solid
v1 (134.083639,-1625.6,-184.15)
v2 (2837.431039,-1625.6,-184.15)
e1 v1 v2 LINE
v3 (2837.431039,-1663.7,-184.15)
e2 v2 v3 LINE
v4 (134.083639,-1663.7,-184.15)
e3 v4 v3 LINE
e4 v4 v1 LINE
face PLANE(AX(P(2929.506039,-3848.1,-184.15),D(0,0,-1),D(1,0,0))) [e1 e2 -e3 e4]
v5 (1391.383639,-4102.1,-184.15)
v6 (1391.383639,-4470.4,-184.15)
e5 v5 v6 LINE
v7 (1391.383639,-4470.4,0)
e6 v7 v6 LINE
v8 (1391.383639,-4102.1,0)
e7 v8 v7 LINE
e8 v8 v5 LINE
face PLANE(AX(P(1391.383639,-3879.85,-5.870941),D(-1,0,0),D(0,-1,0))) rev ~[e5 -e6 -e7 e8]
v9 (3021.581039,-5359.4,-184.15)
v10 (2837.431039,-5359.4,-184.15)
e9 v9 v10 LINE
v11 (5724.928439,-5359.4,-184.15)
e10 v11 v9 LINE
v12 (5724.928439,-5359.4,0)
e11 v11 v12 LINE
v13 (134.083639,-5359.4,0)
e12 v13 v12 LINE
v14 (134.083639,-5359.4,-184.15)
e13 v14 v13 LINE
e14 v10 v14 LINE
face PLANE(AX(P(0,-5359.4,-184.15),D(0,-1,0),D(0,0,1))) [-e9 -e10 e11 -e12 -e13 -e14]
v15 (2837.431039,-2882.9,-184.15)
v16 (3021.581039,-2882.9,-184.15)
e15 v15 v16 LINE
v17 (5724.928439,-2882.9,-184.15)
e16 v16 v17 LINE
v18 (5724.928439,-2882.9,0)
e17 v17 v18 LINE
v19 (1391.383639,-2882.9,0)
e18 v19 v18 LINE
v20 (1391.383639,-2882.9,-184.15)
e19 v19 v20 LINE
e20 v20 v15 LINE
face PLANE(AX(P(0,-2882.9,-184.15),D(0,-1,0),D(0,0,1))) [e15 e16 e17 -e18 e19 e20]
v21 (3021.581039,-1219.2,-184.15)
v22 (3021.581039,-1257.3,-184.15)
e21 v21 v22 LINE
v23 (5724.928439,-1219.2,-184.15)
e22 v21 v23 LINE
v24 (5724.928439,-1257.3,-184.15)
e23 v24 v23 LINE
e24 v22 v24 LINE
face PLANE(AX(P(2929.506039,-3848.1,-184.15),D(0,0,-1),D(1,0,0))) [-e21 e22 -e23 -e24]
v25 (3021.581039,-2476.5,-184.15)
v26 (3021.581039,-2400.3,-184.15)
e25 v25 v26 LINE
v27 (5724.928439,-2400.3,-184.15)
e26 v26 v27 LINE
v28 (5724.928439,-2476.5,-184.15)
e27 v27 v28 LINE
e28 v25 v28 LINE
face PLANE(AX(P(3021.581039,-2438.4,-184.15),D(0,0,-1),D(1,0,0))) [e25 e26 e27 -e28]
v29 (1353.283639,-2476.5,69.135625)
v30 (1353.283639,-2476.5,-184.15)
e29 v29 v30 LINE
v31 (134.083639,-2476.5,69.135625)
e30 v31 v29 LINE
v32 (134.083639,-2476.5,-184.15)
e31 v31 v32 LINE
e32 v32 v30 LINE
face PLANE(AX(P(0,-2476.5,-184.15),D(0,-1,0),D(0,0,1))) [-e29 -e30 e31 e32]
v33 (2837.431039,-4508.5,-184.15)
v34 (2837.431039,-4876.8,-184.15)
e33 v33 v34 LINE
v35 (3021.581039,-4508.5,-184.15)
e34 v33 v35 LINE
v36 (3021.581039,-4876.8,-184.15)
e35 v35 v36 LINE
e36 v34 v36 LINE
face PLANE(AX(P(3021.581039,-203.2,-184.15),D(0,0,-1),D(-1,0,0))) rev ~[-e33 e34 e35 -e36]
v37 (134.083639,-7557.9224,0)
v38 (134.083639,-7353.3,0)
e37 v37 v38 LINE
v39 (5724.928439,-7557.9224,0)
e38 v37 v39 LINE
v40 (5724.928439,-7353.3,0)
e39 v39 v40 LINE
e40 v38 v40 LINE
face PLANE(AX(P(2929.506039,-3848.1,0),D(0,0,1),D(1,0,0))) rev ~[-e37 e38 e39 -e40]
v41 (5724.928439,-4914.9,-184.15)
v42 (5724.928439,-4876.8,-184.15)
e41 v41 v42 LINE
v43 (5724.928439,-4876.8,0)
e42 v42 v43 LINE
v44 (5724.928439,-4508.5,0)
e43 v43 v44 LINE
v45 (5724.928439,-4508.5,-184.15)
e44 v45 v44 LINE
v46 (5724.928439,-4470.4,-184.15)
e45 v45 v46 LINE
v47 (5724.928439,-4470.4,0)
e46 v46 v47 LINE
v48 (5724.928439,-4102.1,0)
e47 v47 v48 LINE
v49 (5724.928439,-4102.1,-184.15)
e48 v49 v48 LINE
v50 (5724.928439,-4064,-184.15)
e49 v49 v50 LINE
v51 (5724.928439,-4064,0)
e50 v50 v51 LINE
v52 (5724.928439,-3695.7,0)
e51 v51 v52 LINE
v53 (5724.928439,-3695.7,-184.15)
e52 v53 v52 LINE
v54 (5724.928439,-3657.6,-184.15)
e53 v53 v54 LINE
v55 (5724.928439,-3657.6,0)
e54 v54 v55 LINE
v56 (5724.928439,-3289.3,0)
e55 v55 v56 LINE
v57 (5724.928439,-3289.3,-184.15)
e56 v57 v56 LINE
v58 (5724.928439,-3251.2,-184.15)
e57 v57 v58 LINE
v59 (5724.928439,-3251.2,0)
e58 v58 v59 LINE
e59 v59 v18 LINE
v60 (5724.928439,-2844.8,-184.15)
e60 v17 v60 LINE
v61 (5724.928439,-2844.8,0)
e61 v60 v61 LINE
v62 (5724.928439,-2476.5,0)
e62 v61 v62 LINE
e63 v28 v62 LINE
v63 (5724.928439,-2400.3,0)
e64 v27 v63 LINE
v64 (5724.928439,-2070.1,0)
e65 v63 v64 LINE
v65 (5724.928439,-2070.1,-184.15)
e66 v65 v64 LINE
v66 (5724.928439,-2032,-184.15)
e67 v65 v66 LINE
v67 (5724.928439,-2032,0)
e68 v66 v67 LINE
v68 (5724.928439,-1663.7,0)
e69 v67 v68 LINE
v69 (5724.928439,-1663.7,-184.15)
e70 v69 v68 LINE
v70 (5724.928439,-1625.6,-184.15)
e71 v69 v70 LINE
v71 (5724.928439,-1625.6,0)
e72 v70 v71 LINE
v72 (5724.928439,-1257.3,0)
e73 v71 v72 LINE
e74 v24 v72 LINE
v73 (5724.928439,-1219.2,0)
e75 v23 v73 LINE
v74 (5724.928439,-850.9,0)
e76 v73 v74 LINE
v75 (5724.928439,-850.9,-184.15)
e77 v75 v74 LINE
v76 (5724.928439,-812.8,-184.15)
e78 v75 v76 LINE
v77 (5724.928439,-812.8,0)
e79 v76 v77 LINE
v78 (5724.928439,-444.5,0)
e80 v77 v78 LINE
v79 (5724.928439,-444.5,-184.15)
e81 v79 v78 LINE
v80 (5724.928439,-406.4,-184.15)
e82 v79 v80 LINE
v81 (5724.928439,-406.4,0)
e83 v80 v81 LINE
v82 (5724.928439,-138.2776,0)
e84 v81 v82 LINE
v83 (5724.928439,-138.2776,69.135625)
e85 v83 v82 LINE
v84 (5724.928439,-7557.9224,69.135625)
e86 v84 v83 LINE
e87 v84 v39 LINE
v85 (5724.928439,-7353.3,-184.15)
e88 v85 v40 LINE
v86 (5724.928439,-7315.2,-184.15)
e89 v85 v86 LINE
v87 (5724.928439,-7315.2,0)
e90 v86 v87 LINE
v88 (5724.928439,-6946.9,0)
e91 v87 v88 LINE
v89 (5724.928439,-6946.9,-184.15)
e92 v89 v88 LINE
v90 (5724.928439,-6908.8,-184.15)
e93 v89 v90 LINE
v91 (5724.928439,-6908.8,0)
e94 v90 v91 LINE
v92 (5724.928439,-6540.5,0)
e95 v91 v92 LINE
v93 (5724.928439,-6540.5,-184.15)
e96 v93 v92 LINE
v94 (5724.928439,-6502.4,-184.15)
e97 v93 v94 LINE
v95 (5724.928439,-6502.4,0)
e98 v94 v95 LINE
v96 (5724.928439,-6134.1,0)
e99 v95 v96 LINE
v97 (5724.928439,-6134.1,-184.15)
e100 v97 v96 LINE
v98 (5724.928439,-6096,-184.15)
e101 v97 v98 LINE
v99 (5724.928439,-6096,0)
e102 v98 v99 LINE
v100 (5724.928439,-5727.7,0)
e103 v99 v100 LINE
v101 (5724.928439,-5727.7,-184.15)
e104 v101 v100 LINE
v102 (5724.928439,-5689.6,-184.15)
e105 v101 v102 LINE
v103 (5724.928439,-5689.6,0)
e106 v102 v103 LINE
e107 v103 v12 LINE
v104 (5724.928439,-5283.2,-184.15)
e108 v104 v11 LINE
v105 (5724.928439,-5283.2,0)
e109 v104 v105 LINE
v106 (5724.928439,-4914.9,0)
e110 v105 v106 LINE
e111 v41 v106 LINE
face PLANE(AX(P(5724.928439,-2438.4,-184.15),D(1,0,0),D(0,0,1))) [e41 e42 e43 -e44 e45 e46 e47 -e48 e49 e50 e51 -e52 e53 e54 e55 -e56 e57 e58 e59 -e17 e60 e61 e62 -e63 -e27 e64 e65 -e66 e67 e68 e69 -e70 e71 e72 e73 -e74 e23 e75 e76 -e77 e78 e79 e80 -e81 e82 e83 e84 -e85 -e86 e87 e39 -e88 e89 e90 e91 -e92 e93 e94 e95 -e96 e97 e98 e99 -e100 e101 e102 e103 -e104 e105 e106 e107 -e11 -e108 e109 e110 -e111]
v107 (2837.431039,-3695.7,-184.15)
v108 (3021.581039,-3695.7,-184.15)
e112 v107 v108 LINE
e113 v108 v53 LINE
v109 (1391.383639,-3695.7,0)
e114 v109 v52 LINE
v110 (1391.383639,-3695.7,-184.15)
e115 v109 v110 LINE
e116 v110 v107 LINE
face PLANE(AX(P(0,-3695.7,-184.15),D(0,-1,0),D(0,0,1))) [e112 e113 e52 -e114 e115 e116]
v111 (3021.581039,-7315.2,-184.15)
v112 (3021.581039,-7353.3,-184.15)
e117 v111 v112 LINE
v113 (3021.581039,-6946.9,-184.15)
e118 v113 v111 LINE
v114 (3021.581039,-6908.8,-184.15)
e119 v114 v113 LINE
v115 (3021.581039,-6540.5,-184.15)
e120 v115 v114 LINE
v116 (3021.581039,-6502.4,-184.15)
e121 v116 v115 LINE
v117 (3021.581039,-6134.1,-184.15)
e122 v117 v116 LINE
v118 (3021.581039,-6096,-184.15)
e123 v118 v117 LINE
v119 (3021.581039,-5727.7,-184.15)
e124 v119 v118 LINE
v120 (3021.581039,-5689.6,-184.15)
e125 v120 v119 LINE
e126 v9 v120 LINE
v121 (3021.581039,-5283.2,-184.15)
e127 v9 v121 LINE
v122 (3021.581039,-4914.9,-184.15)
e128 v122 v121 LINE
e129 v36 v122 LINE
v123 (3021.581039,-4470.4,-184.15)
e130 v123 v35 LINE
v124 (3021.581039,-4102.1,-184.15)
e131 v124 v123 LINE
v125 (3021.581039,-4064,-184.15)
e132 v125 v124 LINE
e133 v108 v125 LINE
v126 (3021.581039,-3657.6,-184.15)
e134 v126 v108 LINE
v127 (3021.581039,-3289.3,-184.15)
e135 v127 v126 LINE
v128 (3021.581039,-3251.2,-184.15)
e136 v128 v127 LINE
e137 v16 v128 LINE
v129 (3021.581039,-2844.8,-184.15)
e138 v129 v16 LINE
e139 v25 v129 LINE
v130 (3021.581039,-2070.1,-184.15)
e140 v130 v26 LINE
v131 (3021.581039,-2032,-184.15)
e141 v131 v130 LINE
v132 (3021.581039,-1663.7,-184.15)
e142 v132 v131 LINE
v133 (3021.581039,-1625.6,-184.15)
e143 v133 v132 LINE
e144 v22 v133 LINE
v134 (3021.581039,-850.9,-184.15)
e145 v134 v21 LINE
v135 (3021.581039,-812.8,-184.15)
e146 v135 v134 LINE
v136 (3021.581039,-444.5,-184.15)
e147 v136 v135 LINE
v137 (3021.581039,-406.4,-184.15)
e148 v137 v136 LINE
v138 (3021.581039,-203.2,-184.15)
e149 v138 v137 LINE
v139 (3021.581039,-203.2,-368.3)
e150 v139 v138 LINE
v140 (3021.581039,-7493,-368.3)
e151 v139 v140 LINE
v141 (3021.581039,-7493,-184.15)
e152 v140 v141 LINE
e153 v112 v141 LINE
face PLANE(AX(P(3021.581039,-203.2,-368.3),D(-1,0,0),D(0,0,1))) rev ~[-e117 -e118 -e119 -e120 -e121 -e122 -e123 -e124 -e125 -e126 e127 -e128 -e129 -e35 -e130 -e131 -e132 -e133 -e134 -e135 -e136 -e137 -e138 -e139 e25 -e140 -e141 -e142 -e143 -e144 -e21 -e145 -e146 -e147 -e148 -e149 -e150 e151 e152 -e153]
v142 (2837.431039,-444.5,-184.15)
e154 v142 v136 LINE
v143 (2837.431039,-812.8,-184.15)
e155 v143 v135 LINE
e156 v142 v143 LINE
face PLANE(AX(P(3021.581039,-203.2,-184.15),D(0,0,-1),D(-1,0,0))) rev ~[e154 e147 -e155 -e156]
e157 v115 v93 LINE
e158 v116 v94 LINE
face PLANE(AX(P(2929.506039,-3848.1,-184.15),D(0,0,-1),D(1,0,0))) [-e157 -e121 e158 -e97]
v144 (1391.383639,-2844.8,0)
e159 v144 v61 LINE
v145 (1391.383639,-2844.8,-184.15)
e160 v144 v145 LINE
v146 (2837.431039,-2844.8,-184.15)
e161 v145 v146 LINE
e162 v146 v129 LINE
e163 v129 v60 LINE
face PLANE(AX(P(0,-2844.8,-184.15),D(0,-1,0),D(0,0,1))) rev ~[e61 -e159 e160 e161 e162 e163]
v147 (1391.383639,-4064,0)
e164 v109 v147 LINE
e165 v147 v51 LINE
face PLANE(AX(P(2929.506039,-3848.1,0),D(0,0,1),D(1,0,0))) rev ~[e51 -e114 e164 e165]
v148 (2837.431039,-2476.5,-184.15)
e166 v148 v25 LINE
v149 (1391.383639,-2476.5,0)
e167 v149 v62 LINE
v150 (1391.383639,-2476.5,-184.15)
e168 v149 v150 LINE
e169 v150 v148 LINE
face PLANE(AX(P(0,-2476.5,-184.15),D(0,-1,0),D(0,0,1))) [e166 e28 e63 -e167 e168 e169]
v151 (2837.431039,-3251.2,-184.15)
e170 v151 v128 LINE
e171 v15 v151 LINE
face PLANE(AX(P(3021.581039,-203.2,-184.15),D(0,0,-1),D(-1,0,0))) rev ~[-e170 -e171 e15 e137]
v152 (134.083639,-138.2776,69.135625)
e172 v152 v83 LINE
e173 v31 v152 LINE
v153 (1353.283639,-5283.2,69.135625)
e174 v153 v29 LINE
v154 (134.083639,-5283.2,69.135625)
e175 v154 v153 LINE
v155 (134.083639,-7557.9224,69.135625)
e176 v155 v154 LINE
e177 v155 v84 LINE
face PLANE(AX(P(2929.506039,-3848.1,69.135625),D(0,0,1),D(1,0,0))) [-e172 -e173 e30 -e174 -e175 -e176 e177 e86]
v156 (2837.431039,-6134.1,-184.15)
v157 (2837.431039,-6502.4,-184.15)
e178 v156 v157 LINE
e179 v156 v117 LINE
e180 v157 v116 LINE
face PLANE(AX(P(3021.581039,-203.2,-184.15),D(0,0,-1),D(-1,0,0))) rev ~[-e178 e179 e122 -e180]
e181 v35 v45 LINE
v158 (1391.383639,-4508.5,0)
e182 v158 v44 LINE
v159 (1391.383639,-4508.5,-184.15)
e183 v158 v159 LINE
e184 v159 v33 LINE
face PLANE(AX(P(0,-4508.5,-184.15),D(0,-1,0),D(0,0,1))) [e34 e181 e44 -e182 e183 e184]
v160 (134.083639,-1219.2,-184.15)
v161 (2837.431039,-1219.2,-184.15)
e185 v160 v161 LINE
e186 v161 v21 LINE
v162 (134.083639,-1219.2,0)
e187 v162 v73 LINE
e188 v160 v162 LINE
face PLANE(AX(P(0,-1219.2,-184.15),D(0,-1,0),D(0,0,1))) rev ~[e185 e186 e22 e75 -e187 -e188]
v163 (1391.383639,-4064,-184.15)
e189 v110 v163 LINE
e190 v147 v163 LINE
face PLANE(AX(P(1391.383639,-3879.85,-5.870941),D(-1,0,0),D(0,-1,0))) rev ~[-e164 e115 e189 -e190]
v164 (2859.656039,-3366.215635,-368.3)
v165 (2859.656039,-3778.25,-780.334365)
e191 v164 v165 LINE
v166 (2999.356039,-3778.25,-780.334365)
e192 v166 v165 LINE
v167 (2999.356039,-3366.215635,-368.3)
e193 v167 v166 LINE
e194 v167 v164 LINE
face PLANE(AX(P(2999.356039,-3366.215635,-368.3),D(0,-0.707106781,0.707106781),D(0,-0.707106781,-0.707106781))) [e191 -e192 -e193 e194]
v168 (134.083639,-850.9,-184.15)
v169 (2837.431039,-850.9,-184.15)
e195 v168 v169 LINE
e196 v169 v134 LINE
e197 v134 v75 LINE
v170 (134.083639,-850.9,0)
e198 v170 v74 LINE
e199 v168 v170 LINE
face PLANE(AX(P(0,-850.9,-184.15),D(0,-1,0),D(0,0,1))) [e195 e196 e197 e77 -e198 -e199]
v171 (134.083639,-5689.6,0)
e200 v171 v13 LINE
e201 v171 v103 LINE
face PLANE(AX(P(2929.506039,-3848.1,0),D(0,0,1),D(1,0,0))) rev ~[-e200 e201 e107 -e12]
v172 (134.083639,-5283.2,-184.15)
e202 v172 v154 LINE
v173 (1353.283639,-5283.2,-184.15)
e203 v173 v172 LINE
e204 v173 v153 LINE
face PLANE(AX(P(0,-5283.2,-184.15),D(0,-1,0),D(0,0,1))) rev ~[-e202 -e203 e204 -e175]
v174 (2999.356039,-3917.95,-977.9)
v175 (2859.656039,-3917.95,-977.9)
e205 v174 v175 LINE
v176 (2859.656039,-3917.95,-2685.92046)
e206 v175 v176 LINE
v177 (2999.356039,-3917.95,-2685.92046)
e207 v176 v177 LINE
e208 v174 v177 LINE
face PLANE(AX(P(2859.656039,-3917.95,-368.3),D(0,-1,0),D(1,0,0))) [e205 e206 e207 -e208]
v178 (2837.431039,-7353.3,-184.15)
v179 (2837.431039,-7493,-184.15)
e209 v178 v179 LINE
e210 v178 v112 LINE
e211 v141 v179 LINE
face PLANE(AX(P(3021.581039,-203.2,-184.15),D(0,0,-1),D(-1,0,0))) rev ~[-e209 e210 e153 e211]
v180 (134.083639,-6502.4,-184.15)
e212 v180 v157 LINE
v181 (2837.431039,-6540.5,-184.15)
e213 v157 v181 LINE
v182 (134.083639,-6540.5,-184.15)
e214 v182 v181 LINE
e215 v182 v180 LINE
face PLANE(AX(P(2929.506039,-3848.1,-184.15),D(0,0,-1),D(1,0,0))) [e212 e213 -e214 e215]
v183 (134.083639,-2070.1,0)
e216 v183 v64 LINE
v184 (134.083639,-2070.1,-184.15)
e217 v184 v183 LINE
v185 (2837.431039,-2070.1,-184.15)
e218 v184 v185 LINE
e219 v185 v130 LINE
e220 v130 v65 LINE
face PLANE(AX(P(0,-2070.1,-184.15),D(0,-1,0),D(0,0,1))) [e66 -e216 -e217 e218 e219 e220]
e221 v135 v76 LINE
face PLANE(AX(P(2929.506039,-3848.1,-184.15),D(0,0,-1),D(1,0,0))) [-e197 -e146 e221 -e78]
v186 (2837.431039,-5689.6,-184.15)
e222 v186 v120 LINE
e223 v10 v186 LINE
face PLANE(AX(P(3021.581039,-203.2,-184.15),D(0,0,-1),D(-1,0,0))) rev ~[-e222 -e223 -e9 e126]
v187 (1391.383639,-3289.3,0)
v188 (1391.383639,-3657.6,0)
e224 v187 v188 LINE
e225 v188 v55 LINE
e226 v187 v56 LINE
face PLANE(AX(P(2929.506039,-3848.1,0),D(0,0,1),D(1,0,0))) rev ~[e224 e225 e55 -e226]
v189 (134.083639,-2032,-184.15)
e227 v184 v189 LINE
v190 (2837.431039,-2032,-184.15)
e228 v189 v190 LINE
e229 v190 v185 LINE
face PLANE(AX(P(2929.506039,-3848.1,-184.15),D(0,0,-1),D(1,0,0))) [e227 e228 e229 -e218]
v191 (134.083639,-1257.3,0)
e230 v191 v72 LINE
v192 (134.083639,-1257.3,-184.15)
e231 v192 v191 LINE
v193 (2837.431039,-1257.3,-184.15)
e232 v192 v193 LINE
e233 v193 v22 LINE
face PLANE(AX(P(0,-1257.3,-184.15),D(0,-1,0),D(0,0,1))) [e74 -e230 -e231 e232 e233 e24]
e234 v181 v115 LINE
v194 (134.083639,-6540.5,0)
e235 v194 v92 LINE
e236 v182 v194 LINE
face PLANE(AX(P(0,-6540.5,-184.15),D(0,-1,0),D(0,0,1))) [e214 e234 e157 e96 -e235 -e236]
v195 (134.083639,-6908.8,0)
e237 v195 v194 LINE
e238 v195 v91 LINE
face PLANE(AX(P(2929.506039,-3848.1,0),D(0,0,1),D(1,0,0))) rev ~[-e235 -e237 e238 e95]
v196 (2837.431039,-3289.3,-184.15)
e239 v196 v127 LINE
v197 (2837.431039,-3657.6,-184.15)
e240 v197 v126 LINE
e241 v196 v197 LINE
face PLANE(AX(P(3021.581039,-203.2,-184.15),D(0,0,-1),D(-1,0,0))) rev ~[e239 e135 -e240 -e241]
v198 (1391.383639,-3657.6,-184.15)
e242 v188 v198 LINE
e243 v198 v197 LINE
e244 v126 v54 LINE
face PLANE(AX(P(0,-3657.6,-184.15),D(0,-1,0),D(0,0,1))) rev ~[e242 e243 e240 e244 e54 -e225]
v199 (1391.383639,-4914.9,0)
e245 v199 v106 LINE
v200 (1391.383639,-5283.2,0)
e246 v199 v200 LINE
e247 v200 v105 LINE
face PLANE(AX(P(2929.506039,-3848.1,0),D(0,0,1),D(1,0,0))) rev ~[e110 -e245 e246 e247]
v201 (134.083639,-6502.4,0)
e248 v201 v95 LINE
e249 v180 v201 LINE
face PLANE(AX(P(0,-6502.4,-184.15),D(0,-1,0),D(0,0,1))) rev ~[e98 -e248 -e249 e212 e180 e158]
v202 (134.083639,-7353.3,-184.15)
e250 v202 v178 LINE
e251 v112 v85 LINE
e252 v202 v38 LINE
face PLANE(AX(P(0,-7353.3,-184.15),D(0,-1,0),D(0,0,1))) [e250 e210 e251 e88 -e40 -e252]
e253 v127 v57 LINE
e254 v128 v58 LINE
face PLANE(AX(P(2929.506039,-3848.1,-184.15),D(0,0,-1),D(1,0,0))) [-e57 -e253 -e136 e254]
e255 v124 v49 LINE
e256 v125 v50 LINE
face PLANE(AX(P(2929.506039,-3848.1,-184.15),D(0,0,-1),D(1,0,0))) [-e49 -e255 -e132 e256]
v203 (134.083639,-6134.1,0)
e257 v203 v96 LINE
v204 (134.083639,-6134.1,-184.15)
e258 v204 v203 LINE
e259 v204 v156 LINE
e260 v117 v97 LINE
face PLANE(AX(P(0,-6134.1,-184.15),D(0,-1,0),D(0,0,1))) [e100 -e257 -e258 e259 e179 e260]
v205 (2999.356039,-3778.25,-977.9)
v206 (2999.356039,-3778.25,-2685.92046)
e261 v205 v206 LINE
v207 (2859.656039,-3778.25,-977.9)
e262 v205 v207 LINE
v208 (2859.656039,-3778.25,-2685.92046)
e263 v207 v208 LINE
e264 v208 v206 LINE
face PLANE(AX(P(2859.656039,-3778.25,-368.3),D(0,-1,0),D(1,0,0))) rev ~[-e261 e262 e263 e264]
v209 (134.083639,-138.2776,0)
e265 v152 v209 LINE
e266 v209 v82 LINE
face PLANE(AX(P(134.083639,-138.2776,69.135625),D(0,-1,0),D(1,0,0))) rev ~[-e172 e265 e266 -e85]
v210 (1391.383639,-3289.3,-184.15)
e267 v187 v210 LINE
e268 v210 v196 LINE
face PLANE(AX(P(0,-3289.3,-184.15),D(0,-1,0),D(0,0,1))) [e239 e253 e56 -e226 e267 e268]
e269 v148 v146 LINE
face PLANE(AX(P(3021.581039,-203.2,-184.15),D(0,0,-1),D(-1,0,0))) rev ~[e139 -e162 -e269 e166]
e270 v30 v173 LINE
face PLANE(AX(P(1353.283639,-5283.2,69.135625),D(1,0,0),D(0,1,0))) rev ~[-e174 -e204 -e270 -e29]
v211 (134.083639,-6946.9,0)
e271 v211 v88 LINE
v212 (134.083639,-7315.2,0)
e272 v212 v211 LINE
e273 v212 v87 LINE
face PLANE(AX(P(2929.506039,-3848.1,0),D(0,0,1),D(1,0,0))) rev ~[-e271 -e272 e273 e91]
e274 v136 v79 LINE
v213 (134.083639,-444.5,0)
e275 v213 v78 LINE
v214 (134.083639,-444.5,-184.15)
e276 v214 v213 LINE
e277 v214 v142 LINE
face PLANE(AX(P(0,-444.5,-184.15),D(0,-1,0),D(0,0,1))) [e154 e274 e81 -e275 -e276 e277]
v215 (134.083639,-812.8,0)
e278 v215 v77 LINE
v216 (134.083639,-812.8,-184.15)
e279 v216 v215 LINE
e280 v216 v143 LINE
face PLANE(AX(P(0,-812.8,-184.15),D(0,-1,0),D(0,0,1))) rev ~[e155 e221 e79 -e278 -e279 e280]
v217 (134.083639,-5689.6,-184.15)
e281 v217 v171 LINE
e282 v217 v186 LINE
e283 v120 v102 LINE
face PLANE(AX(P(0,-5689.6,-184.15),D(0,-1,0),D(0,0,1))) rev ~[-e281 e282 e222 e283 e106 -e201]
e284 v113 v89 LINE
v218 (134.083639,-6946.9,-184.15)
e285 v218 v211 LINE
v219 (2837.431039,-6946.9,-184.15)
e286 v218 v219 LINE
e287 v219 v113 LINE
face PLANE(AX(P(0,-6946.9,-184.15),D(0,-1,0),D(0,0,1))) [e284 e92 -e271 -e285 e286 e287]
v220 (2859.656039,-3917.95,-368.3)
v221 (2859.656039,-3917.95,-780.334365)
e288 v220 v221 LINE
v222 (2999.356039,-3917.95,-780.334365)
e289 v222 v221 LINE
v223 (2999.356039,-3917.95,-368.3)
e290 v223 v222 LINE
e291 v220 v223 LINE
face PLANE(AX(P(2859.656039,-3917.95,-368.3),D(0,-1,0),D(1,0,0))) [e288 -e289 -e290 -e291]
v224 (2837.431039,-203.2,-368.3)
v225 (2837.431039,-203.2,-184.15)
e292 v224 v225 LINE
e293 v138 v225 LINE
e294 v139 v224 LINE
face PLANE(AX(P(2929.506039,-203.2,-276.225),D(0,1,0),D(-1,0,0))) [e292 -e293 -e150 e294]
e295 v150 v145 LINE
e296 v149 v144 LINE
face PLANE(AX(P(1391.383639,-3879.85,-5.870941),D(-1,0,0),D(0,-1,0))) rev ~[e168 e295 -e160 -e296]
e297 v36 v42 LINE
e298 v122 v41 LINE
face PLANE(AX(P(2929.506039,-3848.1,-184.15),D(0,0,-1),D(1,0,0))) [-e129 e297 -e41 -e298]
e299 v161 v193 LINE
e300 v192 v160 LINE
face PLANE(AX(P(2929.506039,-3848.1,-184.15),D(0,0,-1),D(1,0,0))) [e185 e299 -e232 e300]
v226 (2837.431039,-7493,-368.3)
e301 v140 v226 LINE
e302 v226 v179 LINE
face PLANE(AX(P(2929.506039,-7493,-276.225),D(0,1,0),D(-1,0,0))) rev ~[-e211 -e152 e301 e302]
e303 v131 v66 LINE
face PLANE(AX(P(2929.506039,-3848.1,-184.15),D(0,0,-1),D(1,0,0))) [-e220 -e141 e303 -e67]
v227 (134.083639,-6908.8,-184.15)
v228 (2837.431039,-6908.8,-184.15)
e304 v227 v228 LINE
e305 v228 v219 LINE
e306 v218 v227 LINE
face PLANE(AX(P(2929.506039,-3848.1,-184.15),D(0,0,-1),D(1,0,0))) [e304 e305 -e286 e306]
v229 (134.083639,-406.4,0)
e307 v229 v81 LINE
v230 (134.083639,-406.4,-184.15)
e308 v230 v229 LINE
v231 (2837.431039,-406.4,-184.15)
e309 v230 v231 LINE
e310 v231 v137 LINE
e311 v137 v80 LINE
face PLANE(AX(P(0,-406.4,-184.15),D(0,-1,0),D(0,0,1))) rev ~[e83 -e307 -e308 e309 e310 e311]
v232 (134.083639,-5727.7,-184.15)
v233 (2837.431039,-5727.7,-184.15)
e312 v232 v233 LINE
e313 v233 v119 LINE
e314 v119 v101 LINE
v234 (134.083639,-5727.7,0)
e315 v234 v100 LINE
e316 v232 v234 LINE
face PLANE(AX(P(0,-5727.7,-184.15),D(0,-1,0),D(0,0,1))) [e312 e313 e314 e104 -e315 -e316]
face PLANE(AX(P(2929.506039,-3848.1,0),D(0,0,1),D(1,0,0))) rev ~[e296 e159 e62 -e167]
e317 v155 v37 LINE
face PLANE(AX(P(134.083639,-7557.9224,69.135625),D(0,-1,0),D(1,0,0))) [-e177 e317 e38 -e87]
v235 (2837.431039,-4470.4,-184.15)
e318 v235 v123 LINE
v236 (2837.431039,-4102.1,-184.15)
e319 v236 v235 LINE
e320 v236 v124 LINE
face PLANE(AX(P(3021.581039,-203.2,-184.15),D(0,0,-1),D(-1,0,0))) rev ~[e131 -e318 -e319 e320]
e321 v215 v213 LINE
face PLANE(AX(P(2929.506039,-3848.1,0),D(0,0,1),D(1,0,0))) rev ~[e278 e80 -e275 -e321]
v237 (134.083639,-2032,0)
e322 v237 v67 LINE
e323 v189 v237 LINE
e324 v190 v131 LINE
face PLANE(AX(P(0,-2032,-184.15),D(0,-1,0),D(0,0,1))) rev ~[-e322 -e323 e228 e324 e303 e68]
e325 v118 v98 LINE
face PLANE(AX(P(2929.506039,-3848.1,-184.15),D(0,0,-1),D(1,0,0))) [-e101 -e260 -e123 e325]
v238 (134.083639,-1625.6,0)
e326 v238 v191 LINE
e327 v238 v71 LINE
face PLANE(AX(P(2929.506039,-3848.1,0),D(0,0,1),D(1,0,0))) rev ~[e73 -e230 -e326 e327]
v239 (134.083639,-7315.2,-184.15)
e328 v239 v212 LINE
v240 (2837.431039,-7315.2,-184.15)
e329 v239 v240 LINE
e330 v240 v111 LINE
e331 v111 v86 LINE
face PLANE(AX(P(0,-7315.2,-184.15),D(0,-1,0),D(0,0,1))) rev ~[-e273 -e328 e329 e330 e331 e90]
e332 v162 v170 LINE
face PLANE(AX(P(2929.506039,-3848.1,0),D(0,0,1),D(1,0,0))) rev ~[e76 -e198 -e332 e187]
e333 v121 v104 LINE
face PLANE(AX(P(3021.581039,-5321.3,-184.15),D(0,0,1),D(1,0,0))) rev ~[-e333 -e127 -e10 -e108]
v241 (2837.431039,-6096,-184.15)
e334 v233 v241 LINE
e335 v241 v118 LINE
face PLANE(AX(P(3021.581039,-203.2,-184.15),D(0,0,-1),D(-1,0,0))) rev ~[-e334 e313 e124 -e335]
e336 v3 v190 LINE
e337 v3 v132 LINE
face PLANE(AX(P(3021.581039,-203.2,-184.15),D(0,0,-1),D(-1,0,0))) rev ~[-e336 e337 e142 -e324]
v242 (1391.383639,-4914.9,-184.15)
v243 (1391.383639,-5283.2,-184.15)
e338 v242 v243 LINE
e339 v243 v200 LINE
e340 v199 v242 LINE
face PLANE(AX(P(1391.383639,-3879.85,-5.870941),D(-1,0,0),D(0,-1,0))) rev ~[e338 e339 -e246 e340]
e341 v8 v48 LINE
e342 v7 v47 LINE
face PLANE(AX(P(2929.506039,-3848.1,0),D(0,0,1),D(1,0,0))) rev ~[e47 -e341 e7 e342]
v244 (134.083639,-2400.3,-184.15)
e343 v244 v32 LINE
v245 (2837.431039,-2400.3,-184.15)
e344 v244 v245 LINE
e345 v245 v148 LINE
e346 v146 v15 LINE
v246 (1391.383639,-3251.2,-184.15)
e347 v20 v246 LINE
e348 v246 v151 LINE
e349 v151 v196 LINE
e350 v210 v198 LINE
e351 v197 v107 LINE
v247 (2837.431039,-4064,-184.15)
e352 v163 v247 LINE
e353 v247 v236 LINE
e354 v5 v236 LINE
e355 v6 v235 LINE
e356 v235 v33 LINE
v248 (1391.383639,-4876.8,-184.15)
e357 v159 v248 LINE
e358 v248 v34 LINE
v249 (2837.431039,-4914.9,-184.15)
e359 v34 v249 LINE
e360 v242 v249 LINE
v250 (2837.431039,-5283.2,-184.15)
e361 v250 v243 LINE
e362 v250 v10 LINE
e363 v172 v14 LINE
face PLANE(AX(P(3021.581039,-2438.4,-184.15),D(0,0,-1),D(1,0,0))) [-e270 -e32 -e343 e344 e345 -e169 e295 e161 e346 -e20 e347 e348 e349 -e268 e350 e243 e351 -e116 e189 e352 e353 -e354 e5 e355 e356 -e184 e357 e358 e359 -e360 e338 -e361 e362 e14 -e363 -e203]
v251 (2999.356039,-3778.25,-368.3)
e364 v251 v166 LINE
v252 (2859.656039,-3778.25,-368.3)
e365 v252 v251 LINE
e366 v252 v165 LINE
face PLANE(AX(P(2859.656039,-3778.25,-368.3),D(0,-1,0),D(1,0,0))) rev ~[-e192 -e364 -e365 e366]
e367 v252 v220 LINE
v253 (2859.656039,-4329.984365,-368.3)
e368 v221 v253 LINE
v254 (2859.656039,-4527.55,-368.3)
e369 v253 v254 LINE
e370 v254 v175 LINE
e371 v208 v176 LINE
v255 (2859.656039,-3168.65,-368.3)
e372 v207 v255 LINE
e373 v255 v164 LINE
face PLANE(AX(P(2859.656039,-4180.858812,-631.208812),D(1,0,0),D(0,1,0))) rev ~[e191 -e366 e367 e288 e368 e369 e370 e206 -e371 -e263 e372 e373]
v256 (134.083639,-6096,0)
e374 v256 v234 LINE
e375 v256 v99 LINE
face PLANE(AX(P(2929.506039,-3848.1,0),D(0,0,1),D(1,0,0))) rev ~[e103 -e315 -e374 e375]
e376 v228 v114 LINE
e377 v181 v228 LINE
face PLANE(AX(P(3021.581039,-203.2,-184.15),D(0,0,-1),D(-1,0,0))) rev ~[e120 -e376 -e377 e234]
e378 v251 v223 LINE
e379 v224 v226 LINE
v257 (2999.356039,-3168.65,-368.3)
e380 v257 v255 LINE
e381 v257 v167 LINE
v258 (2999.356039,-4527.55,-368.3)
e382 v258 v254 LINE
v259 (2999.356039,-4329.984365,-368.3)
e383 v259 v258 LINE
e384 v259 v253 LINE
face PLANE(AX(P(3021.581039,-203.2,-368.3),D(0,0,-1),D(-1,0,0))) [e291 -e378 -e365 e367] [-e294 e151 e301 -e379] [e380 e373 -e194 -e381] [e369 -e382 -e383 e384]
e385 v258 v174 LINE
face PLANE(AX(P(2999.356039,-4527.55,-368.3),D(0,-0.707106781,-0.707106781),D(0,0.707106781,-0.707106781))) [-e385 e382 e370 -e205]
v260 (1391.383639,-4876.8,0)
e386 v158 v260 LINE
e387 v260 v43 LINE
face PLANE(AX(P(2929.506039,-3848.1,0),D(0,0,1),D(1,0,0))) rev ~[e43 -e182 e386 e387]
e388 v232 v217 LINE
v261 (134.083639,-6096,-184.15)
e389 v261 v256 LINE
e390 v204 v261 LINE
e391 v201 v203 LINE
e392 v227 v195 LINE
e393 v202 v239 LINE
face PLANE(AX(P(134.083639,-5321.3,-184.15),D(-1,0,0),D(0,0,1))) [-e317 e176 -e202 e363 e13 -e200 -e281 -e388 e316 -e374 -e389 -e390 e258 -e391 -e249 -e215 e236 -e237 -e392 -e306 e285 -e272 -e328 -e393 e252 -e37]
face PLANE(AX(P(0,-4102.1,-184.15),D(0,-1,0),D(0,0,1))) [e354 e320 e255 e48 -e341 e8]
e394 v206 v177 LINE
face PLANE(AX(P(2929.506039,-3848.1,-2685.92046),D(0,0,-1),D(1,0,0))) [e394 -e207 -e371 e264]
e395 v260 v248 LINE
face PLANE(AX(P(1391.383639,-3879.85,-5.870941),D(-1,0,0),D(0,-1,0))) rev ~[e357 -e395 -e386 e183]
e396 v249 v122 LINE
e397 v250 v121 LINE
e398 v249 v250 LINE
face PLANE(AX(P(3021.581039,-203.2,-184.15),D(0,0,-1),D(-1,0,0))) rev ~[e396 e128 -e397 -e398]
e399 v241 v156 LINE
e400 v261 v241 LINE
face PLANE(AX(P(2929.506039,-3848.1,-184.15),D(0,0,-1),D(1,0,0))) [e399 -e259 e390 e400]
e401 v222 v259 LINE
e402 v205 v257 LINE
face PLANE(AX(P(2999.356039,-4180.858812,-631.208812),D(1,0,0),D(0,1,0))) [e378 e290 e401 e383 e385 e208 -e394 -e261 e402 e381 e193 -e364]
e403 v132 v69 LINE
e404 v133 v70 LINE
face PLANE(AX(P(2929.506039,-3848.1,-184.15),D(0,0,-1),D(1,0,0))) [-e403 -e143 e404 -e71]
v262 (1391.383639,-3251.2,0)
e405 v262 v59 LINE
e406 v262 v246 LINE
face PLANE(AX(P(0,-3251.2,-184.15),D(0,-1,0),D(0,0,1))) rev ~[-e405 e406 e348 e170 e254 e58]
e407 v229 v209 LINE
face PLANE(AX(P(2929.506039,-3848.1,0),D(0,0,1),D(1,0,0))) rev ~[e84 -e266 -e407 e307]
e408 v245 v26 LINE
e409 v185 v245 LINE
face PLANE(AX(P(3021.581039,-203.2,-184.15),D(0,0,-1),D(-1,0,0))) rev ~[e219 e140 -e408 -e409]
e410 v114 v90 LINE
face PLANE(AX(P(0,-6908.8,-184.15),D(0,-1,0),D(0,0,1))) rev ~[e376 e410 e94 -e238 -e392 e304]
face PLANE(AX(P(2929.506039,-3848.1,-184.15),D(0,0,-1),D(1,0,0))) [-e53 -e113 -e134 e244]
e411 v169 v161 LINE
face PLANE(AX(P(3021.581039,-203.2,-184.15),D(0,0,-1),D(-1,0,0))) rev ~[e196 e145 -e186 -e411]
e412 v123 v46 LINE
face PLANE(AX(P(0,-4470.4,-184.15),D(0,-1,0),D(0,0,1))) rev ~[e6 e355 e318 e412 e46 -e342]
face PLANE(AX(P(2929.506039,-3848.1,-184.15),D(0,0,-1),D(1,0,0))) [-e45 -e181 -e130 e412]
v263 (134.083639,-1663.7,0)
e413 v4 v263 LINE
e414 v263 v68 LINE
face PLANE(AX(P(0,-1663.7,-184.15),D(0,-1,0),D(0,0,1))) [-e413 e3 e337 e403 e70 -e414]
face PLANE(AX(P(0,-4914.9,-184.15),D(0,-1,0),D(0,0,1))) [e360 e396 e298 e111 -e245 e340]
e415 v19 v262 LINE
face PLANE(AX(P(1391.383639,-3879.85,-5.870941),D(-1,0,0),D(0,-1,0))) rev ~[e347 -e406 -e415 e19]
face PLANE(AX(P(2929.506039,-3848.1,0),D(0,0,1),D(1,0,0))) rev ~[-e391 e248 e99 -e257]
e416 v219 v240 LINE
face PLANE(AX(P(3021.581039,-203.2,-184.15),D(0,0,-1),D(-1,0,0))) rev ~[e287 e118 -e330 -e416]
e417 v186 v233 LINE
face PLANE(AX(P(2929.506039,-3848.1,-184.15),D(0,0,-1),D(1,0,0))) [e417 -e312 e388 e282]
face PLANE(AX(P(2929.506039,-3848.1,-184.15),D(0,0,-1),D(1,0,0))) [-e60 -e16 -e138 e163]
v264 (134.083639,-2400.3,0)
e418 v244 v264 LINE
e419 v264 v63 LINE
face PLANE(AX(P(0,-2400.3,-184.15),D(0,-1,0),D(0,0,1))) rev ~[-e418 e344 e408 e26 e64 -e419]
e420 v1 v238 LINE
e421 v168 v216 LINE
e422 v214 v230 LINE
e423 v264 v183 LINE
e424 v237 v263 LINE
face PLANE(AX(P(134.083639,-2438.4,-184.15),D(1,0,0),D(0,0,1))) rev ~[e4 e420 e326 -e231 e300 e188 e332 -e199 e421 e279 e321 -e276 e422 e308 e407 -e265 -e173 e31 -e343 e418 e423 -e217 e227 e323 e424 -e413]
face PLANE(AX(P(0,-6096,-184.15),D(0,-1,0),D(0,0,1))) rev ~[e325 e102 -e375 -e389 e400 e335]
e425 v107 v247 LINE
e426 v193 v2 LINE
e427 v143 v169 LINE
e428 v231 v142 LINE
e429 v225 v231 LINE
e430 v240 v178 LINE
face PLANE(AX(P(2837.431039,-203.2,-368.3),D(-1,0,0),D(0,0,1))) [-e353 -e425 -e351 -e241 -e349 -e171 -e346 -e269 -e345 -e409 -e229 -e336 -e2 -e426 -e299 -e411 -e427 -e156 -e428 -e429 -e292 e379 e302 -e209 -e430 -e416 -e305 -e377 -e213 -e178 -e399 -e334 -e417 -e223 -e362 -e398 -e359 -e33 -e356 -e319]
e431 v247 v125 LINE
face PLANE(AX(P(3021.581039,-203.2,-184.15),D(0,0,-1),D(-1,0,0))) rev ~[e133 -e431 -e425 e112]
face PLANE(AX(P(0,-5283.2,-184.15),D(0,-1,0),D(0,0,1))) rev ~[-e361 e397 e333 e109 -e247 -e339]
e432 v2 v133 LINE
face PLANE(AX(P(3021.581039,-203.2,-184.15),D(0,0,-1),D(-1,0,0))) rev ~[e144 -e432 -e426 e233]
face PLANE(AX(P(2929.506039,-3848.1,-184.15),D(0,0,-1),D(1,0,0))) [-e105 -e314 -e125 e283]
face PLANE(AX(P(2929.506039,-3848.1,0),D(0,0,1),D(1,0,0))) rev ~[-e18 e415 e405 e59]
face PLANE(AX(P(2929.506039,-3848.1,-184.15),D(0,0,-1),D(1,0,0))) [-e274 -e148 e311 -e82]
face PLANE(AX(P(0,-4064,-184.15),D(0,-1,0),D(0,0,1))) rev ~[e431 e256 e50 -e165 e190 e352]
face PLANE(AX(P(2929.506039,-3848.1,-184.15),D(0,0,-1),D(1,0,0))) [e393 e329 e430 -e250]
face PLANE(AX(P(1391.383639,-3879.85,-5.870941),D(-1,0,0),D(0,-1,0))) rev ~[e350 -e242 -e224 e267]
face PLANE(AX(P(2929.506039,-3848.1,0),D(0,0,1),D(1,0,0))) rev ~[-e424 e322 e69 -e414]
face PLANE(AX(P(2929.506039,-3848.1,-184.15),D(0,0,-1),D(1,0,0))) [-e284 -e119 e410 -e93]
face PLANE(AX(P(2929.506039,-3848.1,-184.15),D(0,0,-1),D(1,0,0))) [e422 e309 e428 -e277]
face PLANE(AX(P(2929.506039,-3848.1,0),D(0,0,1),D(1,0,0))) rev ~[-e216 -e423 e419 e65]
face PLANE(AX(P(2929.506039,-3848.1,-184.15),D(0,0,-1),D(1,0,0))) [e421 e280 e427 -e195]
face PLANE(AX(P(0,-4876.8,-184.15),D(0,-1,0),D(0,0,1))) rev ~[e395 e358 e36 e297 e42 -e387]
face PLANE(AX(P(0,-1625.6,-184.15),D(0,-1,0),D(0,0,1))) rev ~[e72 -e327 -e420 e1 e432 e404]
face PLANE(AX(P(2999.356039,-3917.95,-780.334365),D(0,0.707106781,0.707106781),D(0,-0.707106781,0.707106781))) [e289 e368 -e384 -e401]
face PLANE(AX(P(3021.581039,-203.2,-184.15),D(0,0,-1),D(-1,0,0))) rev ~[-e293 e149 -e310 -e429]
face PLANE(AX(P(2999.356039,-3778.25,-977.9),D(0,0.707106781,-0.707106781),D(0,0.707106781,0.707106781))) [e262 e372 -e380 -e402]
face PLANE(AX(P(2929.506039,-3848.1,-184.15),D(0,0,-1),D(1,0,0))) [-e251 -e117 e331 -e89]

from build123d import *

# Parameters (mm, degrees)
F0_W      = 5867.4
F0_H      = 7696.2
F1_DEPTH  = 69.135625
F2_W      = 5867.4
F2_H      = 7696.2
F2_W_2    = 5791.2
F2_H_2    = 7620
F3_DEPTH  = 184.15
F4_W      = 38.1
F4_H      = 184.15
F5_DEPTH  = 5863.2060388453
F7_W      = 184.15
F7_H      = 184.15
F8_DEPTH  = 7289.8
F9_W      = 139.7
F9_H      = 139.7
F10_DEPTH = 2317.62046
F12_DEPTH = 139.7
F13_W     = 5867.4
F13_H     = 7696.2
F13_W_2   = 5590.8448
F13_H_2   = 7419.6448
F14_DEPTH = 253.285625
F15_W     = 1219.2
F15_H     = 2806.7
F16_DEPTH = 253.285625
F17_W     = 368.3
F17_H     = 184.15
F18_DEPTH = 38.1
F19_DEPTH = 38.1
F20_DEPTH = 38.1


with BuildPart() as f1:
    # F0 (on Top) → F1 (new body)
    with BuildSketch(Plane.XY):
        with Locations((2929.5060388453, -3848.1)):
            Rectangle(F0_W, F0_H)
    extrude(amount=F1_DEPTH)

    # F2 (on face) → F3 (join)
    with BuildSketch(Plane(origin=(0, 0, 0), x_dir=(1, 0, 0), z_dir=(0, 0, -1))):
        with Locations((2929.5060388453, 3848.1)):
            Rectangle(F2_W, F2_H)
        with Locations((2929.5060388453, 3848.1)):
            Rectangle(F2_W_2, F2_H_2, mode=Mode.SUBTRACT)
    extrude(amount=F3_DEPTH)

    # F4 (on Right) → F5 (join, through all)
    with BuildSketch(Plane.YZ):
        with Locations((-425.45, -92.075)):
            Rectangle(F4_W, F4_H)
        with Locations((-831.85, -92.075)):
            Rectangle(F4_W, F4_H)
        with Locations((-1238.25, -92.075)):
            Rectangle(F4_W, F4_H)
        with Locations((-1644.65, -92.075)):
            Rectangle(F4_W, F4_H)
        with Locations((-2051.05, -92.075)):
            Rectangle(F4_W, F4_H)
        with Locations((-2457.45, -92.075)):
            Rectangle(F4_W, F4_H)
        with Locations((-2863.85, -92.075)):
            Rectangle(F4_W, F4_H)
        with Locations((-3270.25, -92.075)):
            Rectangle(F4_W, F4_H)
        with Locations((-3676.65, -92.075)):
            Rectangle(F4_W, F4_H)
        with Locations((-4083.05, -92.075)):
            Rectangle(F4_W, F4_H)
        with Locations((-4489.45, -92.075)):
            Rectangle(F4_W, F4_H)
        with Locations((-4895.85, -92.075)):
            Rectangle(F4_W, F4_H)
        with Locations((-5302.25, -92.075)):
            Rectangle(F4_W, F4_H)
        with Locations((-5708.65, -92.075)):
            Rectangle(F4_W, F4_H)
        with Locations((-6115.05, -92.075)):
            Rectangle(F4_W, F4_H)
        with Locations((-6521.45, -92.075)):
            Rectangle(F4_W, F4_H)
        with Locations((-6927.85, -92.075)):
            Rectangle(F4_W, F4_H)
        with Locations((-7334.25, -92.075)):
            Rectangle(F4_W, F4_H)
    extrude(amount=F5_DEPTH)

    # F7 (on offset) → F8 (join)
    with BuildSketch(Plane(origin=(0, -203.2, 0), x_dir=(-1, 0, 0), z_dir=(0, 1, 0))):
        with Locations((-2929.5060388453, -276.225)):
            Rectangle(F7_W, F7_H)
    extrude(amount=-F8_DEPTH)

    # F9 (on face) → F10 (join)
    with BuildSketch(Plane(origin=(0, 0, -368.3), x_dir=(1, 0, 0), z_dir=(0, 0, -1))):
        with Locations((2929.5060388453, 3848.1)):
            Rectangle(F9_W, F9_H)
    extrude(amount=F10_DEPTH)

    # F11 (on face) → F12 (join, through all)
    with BuildSketch(Plane.YZ.offset(2999.3560388453)):
        Polygon((-3917.95, -780.3343653365), (-4329.9843653365, -368.3), (-4527.55, -368.3), (-3917.95, -977.9), align=None)
        Polygon((-3366.2156346635, -368.3), (-3778.25, -780.3343653365), (-3778.25, -977.9), (-3168.65, -368.3), align=None)
    extrude(amount=-F12_DEPTH)

    # F13 (on face) → F14 (cut, through all)
    with BuildSketch(Plane.XY.offset(69.135625)):
        with Locations((2929.5060388453, -3848.1)):
            Rectangle(F13_W, F13_H)
        with Locations((2929.5060388453, -3848.1)):
            Rectangle(F13_W_2, F13_H_2, mode=Mode.SUBTRACT)
    extrude(amount=-F14_DEPTH, mode=Mode.SUBTRACT)

    # F15 (on face) → F16 (cut, through all)
    with BuildSketch(Plane.XY.offset(69.135625)):
        with Locations((743.6836388453, -3879.85)):
            Rectangle(F15_W, F15_H)
    extrude(amount=-F16_DEPTH, mode=Mode.SUBTRACT)

    # F17 (on face) → F18 (join)
    with BuildSketch(Plane(origin=(1353.2836388453, 0, 0), x_dir=(0, -1, 0), z_dir=(-1, 0, 0))):
        Polygon((5283.2, 69.135625), (2476.5, 69.135625), (2476.5, 0), (2844.8, 0), (2844.8, -184.15), (2882.9, -184.15), (2882.9, 0), (3251.2, 0), (3251.2, -184.15), (3289.3, -184.15), (3289.3, 0), (3657.6, 0), (3657.6, -184.15), (3695.7, -184.15), (3695.7, 0), (4064, 0), (4064, -184.15), (4102.1, -184.15), (4102.1, 0), (4470.4, 0), (4470.4, -184.15), (4508.5, -184.15), (4508.5, 0), (4876.8, 0), (4876.8, -184.15), (4914.9, -184.15), (4914.9, 0), (5283.2, 0), align=None)
        with Locations((2660.65, -92.075)):
            Rectangle(F17_W, F17_H)
        with Locations((5099.05, -92.075)):
            Rectangle(F17_W, F17_H)
        with Locations((3067.05, -92.075)):
            Rectangle(F17_W, F17_H)
        with Locations((4692.65, -92.075)):
            Rectangle(F17_W, F17_H)
        with Locations((3473.45, -92.075)):
            Rectangle(F17_W, F17_H)
        with Locations((4286.25, -92.075)):
            Rectangle(F17_W, F17_H)
        with Locations((3879.85, -92.075)):
            Rectangle(F17_W, F17_H)
    extrude(amount=-F18_DEPTH)

    # F19 (add): a face of the model
    f19_faces = [f1.faces().sort_by_distance(p)[0] for p in [
        (2929.5060388453, -5321.3, -92.075),
    ]]
    extrude(f19_faces, amount=F19_DEPTH)

    # F20 (add): a face of the model
    f20_faces = [f1.faces().sort_by_distance(p)[0] for p in [
        (2929.5060388453, -2438.4, -92.075),
    ]]
    extrude(f20_faces, amount=F20_DEPTH)


solid = f1.part
